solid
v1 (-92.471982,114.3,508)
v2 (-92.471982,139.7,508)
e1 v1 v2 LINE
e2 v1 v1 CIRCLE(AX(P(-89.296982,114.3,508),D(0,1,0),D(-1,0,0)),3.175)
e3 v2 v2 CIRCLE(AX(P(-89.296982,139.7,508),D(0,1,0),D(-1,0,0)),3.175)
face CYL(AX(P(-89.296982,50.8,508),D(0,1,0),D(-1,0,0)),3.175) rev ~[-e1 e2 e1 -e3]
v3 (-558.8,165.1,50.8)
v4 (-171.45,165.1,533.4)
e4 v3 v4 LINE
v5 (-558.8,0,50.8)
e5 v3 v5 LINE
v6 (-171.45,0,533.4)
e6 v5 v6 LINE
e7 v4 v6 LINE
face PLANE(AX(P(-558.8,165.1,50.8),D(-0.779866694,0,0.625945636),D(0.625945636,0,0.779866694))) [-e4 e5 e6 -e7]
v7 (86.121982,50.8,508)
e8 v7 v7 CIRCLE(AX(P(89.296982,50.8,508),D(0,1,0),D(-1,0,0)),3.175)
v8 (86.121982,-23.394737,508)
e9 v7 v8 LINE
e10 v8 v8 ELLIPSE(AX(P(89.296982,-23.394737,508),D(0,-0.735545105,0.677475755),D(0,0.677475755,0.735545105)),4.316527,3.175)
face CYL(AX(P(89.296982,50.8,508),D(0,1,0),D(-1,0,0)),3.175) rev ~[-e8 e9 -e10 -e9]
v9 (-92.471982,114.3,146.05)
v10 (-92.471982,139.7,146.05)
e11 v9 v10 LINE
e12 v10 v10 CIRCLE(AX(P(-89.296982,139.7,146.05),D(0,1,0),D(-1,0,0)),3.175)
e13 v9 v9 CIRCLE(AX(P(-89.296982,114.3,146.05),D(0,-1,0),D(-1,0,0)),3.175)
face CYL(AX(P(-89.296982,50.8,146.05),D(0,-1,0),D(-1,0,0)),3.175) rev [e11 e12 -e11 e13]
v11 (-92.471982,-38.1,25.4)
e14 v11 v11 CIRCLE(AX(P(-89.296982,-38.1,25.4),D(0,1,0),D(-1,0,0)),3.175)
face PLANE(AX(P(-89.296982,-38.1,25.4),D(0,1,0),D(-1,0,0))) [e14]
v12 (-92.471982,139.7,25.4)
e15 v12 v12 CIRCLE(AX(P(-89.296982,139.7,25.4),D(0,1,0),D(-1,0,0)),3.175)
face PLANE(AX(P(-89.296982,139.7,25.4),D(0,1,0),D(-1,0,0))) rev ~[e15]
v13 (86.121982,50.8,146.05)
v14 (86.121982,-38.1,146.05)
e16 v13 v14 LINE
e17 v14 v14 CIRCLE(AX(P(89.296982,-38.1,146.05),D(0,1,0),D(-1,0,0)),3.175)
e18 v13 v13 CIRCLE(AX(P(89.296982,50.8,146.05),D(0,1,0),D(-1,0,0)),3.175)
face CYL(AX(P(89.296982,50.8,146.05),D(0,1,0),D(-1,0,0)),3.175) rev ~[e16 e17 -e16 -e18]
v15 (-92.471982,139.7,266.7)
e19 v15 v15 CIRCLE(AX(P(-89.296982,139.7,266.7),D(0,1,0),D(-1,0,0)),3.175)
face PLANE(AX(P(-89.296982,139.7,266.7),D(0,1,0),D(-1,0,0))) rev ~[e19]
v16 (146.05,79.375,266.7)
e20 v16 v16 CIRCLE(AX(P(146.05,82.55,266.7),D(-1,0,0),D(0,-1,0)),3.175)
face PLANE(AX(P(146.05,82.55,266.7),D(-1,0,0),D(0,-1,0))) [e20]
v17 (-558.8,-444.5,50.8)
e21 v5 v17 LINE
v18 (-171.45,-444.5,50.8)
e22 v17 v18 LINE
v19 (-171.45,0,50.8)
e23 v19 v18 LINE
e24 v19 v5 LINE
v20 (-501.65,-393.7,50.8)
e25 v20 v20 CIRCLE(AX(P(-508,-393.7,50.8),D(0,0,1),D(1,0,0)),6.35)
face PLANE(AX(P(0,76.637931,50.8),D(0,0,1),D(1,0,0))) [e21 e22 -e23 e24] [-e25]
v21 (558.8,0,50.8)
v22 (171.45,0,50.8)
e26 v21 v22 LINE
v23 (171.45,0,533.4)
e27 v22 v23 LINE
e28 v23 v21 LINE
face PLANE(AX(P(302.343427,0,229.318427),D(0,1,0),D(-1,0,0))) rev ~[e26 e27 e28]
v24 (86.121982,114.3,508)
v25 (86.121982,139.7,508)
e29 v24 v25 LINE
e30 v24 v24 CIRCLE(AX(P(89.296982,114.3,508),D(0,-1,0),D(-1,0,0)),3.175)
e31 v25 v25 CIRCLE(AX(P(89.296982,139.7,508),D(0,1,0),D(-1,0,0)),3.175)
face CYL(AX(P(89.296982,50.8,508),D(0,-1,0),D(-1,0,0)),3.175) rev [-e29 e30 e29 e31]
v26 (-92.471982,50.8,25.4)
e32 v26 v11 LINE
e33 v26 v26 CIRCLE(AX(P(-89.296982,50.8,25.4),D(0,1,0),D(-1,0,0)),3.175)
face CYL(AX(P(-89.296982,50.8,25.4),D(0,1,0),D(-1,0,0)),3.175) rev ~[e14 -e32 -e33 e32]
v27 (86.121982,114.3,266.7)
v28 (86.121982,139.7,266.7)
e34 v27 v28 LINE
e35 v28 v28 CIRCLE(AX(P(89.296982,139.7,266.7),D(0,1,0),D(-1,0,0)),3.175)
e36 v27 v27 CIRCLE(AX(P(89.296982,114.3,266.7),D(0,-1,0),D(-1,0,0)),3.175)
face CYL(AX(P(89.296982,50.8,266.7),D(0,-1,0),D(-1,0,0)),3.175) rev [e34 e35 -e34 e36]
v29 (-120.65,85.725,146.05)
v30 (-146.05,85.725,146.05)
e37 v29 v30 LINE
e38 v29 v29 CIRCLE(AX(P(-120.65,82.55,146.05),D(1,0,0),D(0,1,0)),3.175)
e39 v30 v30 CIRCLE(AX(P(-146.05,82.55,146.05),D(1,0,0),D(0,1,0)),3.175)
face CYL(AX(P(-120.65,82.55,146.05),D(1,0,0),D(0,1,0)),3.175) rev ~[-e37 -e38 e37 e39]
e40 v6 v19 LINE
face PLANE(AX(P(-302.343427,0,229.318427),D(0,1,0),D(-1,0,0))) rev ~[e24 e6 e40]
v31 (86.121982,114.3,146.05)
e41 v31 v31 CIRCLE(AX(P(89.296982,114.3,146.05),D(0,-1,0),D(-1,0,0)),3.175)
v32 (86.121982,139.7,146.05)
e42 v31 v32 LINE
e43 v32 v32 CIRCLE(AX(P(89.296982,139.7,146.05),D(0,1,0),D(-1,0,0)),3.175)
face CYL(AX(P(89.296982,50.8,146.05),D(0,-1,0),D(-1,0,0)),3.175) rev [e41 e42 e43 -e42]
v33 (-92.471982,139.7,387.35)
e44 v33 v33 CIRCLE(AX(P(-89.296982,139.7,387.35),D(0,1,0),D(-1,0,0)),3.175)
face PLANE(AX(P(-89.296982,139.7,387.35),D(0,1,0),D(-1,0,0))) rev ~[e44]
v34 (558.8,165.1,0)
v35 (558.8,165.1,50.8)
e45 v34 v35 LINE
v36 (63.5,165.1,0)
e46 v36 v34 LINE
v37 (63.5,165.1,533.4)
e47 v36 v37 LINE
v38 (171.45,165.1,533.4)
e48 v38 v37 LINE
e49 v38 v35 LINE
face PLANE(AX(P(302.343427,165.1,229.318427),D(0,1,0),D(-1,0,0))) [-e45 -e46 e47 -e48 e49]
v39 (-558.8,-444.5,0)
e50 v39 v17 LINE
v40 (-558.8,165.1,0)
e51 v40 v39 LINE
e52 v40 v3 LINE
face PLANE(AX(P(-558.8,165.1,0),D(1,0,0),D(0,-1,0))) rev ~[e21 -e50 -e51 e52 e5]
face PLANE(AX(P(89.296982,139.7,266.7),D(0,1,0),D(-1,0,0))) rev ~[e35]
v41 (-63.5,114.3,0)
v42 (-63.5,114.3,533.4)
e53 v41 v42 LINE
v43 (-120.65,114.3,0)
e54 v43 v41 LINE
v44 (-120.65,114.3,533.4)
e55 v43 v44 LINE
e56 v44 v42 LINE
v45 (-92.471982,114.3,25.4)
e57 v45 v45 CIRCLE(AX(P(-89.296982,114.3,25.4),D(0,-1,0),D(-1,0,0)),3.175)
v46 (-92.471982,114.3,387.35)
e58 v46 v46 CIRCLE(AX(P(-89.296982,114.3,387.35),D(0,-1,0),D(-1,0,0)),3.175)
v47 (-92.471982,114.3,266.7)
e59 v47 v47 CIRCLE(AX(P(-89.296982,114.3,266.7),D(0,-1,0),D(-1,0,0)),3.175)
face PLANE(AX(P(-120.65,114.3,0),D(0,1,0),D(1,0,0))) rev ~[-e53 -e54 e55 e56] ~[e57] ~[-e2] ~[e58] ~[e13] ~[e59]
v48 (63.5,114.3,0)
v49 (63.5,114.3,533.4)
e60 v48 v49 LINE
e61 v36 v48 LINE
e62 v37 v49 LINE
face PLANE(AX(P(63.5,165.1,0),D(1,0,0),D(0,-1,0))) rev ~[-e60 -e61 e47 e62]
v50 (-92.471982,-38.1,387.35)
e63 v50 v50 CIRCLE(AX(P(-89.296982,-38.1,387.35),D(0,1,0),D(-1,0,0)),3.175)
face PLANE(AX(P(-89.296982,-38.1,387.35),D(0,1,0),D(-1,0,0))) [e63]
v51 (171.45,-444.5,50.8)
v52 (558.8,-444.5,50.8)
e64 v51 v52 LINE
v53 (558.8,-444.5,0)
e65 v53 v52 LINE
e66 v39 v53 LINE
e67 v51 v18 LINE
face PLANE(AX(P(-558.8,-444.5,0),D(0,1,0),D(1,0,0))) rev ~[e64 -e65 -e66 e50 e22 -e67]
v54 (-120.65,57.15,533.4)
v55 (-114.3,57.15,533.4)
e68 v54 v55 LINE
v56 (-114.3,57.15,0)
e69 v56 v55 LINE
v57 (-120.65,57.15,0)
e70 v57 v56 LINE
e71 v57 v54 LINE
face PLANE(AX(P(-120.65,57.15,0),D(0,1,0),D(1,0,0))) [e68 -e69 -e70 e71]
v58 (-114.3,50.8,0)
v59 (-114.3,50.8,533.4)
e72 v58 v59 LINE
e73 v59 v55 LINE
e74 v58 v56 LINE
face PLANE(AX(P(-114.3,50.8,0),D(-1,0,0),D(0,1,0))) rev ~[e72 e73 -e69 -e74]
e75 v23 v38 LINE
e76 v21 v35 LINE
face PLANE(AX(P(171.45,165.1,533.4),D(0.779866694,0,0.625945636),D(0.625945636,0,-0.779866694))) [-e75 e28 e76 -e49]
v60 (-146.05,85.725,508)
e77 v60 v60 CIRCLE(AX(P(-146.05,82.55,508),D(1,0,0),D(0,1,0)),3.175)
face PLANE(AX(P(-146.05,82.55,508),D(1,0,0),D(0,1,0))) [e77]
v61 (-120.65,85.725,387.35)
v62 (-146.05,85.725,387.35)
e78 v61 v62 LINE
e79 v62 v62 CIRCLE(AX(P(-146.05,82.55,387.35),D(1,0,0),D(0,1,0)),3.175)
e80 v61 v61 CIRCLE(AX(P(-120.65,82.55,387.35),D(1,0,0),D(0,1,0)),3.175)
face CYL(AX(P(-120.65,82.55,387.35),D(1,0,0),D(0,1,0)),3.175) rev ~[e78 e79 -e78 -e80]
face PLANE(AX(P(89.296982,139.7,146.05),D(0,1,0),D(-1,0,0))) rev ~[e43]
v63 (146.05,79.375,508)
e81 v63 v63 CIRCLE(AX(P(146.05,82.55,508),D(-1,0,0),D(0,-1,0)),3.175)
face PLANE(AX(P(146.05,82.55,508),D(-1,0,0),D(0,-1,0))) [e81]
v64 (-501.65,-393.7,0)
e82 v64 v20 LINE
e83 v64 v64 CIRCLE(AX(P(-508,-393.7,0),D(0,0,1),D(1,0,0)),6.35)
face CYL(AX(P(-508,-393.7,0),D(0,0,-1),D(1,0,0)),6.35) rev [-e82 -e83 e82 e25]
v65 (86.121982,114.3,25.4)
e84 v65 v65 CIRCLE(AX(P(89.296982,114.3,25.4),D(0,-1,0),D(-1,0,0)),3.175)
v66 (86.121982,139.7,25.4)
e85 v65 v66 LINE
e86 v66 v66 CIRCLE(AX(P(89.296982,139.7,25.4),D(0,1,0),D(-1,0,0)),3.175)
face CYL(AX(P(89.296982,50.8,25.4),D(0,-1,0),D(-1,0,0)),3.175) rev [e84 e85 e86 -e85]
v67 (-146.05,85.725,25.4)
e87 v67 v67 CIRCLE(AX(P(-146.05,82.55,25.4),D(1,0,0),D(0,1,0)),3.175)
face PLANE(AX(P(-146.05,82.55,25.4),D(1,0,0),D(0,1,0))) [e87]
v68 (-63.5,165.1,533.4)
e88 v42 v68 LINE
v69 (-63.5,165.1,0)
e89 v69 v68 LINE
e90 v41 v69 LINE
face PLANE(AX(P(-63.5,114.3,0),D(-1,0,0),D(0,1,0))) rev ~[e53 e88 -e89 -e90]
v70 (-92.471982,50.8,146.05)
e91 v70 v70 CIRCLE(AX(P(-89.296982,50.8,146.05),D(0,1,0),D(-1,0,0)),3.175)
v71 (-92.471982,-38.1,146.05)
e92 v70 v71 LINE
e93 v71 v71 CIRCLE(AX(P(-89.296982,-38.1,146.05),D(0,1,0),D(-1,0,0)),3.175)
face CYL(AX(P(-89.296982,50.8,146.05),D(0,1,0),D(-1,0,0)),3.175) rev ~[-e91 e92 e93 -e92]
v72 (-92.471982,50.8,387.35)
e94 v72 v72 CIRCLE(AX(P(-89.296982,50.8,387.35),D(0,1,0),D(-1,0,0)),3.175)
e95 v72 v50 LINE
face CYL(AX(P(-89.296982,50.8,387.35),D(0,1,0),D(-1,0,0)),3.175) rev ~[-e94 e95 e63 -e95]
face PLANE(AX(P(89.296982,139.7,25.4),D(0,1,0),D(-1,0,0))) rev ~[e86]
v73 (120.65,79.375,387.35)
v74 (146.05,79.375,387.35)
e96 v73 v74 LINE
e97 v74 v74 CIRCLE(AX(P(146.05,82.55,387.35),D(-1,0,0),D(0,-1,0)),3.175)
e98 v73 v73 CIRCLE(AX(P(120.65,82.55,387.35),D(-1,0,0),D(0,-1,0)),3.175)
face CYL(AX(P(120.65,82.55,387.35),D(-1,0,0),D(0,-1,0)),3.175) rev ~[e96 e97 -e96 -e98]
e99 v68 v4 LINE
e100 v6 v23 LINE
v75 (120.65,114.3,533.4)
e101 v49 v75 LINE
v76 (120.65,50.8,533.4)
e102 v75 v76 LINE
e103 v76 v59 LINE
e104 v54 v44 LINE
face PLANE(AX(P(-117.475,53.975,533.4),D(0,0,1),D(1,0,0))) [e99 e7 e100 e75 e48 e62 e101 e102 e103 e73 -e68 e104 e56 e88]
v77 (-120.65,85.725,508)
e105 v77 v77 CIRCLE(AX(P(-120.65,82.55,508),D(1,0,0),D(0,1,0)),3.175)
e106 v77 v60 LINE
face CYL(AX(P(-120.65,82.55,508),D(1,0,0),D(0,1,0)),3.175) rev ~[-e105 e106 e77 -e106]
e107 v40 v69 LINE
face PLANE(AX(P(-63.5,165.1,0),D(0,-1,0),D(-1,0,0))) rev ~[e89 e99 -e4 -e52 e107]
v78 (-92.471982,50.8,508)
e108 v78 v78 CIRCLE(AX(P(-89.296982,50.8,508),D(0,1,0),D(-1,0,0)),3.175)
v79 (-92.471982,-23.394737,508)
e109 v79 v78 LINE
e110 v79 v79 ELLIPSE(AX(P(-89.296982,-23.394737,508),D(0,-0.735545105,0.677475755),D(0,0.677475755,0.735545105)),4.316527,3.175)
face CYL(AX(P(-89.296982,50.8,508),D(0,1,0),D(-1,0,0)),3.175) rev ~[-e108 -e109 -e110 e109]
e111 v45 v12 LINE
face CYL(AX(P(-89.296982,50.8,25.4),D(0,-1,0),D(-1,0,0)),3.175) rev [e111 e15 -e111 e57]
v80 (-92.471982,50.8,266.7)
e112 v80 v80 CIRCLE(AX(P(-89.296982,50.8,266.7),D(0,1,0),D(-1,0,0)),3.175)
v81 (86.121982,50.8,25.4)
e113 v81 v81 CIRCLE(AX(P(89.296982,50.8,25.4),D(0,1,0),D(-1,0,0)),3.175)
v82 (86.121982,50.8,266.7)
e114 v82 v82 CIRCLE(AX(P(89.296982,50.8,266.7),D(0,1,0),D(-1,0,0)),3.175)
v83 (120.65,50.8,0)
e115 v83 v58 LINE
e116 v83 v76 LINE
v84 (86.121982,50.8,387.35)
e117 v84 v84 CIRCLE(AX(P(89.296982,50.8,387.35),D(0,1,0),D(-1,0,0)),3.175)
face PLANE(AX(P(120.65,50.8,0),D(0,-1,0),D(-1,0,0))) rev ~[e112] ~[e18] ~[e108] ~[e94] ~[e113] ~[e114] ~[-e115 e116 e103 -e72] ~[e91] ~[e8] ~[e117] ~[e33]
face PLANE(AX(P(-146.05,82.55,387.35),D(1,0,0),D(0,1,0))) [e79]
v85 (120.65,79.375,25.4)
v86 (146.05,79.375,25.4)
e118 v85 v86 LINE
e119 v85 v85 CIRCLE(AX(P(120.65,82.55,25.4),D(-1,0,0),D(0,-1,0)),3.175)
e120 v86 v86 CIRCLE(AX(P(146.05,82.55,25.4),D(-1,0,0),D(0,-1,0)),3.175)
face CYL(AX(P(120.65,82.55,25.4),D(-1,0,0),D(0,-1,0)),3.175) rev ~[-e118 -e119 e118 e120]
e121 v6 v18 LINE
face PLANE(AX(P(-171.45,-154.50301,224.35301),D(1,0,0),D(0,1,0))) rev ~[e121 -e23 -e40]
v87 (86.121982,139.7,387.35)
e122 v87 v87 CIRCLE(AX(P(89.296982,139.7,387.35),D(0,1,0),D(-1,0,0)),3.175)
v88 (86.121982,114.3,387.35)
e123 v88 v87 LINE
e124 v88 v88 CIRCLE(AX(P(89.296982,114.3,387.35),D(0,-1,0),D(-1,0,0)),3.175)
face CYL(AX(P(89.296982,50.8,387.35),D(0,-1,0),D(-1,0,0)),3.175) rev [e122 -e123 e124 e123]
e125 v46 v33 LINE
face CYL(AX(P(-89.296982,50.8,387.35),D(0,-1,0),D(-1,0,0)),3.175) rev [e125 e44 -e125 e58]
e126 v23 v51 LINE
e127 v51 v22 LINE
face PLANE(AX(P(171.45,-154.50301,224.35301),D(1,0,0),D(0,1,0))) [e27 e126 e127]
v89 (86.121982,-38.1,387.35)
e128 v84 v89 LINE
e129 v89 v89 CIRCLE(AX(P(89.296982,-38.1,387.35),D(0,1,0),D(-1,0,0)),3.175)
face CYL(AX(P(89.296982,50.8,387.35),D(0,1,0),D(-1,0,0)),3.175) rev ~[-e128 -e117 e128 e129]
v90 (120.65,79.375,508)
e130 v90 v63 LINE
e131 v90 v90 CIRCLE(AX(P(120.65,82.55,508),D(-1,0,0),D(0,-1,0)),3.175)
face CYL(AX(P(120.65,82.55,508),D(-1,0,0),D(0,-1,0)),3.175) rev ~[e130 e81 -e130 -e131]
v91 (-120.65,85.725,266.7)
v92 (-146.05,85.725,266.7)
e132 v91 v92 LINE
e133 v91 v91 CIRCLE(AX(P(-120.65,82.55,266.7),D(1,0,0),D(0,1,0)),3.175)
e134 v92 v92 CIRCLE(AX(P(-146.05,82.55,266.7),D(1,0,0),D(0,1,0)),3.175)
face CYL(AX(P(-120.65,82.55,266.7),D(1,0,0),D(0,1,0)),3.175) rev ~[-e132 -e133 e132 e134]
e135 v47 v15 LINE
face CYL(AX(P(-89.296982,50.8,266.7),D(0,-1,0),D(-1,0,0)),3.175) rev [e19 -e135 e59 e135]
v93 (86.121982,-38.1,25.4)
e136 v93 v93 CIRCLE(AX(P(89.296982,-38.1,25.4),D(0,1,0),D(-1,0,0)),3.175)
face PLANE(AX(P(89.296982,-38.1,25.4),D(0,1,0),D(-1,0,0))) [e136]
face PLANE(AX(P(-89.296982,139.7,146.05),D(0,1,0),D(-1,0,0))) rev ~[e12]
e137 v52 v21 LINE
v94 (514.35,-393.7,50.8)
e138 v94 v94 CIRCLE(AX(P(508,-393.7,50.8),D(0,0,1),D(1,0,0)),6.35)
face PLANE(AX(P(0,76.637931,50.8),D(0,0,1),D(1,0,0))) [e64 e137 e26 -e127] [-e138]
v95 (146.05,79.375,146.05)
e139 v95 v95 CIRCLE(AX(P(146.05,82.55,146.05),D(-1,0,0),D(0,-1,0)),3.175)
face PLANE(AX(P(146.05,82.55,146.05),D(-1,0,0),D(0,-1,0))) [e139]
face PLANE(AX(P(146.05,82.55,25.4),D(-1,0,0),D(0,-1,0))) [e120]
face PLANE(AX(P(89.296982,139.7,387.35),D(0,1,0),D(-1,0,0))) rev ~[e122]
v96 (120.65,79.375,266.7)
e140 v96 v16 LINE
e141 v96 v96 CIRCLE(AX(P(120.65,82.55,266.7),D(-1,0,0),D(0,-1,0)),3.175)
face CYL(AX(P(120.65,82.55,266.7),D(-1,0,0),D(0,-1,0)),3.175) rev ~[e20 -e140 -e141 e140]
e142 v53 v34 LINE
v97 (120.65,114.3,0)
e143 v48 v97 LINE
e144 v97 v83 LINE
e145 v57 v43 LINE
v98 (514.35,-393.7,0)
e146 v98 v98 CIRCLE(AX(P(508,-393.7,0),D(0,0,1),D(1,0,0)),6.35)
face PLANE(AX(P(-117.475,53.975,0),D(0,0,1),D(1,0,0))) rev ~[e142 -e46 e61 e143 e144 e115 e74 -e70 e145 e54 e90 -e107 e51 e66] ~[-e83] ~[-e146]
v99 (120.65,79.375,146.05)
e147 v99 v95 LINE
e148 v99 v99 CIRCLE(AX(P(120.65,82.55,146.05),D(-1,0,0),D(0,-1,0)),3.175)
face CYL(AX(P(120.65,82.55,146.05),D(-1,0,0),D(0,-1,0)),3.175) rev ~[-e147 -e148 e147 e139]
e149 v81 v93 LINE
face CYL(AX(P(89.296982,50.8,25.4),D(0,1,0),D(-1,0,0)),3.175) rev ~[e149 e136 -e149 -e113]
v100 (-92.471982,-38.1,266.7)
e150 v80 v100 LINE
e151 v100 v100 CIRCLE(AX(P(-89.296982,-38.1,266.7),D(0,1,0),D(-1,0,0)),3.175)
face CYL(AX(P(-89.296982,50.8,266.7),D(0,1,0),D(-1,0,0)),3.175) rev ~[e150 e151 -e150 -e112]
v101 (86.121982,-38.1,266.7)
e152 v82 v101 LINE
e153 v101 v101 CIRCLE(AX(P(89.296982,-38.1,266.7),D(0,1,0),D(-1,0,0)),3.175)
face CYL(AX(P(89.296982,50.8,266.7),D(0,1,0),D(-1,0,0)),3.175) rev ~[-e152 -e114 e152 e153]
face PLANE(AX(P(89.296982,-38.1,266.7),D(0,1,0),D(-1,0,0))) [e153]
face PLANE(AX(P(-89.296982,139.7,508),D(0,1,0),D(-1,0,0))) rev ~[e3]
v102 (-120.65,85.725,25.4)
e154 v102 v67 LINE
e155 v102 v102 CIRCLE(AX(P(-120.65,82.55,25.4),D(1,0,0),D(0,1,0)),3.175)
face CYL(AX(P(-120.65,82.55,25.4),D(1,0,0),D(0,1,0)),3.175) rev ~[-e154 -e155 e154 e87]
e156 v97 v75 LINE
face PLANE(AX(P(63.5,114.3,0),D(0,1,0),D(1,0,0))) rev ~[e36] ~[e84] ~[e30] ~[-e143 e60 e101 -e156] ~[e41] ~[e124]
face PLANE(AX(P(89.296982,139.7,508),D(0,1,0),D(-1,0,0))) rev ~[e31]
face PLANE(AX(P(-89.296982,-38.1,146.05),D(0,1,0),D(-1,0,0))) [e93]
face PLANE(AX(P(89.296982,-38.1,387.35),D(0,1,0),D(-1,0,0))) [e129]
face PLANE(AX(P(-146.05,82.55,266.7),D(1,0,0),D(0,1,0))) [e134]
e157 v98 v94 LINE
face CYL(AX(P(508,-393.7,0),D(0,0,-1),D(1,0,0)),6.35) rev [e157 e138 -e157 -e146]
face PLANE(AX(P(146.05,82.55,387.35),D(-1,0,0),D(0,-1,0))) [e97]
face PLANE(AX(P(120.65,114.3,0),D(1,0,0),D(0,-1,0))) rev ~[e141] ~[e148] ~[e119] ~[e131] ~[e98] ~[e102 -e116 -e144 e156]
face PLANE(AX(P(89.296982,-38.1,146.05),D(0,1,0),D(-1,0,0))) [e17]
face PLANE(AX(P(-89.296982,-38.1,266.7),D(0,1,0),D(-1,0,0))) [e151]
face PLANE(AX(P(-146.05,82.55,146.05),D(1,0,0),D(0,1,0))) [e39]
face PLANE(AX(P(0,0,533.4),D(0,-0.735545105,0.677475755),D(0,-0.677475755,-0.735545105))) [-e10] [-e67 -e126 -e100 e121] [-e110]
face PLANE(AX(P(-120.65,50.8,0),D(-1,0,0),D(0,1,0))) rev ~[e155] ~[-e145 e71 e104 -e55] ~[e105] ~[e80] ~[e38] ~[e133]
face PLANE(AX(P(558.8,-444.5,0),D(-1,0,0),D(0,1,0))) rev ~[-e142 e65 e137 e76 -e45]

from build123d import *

# Parameters (mm, degrees)
F1_DEPTH  = 533.4
F0_R      = 6.35
F2_DEPTH  = 50.8
F4_DEPTH  = 171.45
F6_DEPTH  = 165.1
F7_R      = 3.175
F8_DEPTH  = 88.9
F9_R      = 3.175
F10_DEPTH = 25.4
F11_R     = 3.175
F12_DEPTH = 25.4
F13_W     = 6.35
F13_H     = 6.35
F14_DEPTH = 533.4


# Not quite as in the source:
# - a feature names something its author has since deleted; it is built from what else it names


with BuildPart() as f1:
    # F0 (on Top) → F1 (new body)
    with BuildSketch(Plane.XY):
        Polygon((-171.45, 165.1), (-171.45, 0), (171.45, 0), (171.45, 165.1), (63.5, 165.1), (63.5, 114.3), (120.65, 114.3), (120.65, 50.8), (-120.65, 50.8), (-120.65, 114.3), (-63.5, 114.3), (-63.5, 165.1), align=None)
    extrude(amount=F1_DEPTH)

    # F0 (on Top) → F2 (join)
    with BuildSketch(Plane.XY):
        Polygon((-171.45, 165.1), (-171.45, 0), (171.45, 0), (171.45, 165.1), (63.5, 165.1), (63.5, 114.3), (120.65, 114.3), (120.65, 50.8), (-120.65, 50.8), (-120.65, 114.3), (-63.5, 114.3), (-63.5, 165.1), align=None)
        Polygon((171.45, 0), (-171.45, 0), (-171.45, 165.1), (-558.8, 165.1), (-558.8, -444.5), (558.8, -444.5), (558.8, 165.1), (171.45, 165.1), align=None)
        with Locations((-508, -393.7)):
            Circle(F0_R, mode=Mode.SUBTRACT)
        with Locations((508, -393.7)):
            Circle(F0_R, mode=Mode.SUBTRACT)
    extrude(amount=F2_DEPTH)

    # F3 (on Right) → F4 (join, symmetric)
    with BuildSketch(Plane.YZ):
        Polygon((-444.5, 50.8), (0, 50.8), (0, 533.4), align=None)
    extrude(amount=F4_DEPTH, both=True)

    # F5 (on face) → F6 (join)
    with BuildSketch(Plane(origin=(0, 165.1, 0), x_dir=(-1, 0, 0), z_dir=(0, 1, 0))):
        Polygon((-558.8, 50.8), (-171.45, 50.8), (-171.45, 533.4), align=None)
        Polygon((171.45, 533.4), (171.45, 50.8), (558.8, 50.8), align=None)
    extrude(amount=-F6_DEPTH)

    # F7 (on face) → F8 (cut, symmetric)
    with BuildSketch(Plane(origin=(0, 50.8, 0), x_dir=(-1, 0, 0), z_dir=(0, 1, 0))):
        with Locations((-89.2969816923, 146.05)):
            Circle(F7_R)
        with Locations((-89.2969816923, 266.7)):
            Circle(F7_R)
        with Locations((-89.2969816923, 25.4)):
            Circle(F7_R)
        with Locations((-89.2969816923, 508)):
            Circle(F7_R)
        with Locations((-89.2969816923, 387.35)):
            Circle(F7_R)
        with Locations((89.2969816923, 25.4)):
            Circle(F7_R)
        with Locations((89.2969816923, 146.05)):
            Circle(F7_R)
        with Locations((89.2969816923, 266.7)):
            Circle(F7_R)
        with Locations((89.2969816923, 387.35)):
            Circle(F7_R)
        with Locations((89.2969816923, 508)):
            Circle(F7_R)
    extrude(amount=F8_DEPTH, both=True, mode=Mode.SUBTRACT)

    # F9 (on face) → F10 (cut)
    with BuildSketch(Plane(origin=(120.65, 0, 0), x_dir=(0, -1, 0), z_dir=(-1, 0, 0))):
        with Locations((-82.55, 25.4)):
            Circle(F9_R)
        with Locations((-82.55, 146.05)):
            Circle(F9_R)
        with Locations((-82.55, 266.7)):
            Circle(F9_R)
        with Locations((-82.55, 387.35)):
            Circle(F9_R)
        with Locations((-82.55, 508)):
            Circle(F9_R)
    extrude(amount=-F10_DEPTH, mode=Mode.SUBTRACT)

    # F11 (on face) → F12 (cut)
    with BuildSketch(Plane.YZ.offset(-120.65)):
        with Locations((82.55, 25.4)):
            Circle(F11_R)
        with Locations((82.55, 146.05)):
            Circle(F11_R)
        with Locations((82.55, 266.7)):
            Circle(F11_R)
        with Locations((82.55, 387.35)):
            Circle(F11_R)
        with Locations((82.55, 508)):
            Circle(F11_R)
    extrude(amount=-F12_DEPTH, mode=Mode.SUBTRACT)

    # F13 (on Top) → F14 (join)
    with BuildSketch(Plane.XY):
        with Locations((-117.475, 53.975)):
            Rectangle(F13_W, F13_H)
    extrude(amount=F14_DEPTH)


solid = f1.part
